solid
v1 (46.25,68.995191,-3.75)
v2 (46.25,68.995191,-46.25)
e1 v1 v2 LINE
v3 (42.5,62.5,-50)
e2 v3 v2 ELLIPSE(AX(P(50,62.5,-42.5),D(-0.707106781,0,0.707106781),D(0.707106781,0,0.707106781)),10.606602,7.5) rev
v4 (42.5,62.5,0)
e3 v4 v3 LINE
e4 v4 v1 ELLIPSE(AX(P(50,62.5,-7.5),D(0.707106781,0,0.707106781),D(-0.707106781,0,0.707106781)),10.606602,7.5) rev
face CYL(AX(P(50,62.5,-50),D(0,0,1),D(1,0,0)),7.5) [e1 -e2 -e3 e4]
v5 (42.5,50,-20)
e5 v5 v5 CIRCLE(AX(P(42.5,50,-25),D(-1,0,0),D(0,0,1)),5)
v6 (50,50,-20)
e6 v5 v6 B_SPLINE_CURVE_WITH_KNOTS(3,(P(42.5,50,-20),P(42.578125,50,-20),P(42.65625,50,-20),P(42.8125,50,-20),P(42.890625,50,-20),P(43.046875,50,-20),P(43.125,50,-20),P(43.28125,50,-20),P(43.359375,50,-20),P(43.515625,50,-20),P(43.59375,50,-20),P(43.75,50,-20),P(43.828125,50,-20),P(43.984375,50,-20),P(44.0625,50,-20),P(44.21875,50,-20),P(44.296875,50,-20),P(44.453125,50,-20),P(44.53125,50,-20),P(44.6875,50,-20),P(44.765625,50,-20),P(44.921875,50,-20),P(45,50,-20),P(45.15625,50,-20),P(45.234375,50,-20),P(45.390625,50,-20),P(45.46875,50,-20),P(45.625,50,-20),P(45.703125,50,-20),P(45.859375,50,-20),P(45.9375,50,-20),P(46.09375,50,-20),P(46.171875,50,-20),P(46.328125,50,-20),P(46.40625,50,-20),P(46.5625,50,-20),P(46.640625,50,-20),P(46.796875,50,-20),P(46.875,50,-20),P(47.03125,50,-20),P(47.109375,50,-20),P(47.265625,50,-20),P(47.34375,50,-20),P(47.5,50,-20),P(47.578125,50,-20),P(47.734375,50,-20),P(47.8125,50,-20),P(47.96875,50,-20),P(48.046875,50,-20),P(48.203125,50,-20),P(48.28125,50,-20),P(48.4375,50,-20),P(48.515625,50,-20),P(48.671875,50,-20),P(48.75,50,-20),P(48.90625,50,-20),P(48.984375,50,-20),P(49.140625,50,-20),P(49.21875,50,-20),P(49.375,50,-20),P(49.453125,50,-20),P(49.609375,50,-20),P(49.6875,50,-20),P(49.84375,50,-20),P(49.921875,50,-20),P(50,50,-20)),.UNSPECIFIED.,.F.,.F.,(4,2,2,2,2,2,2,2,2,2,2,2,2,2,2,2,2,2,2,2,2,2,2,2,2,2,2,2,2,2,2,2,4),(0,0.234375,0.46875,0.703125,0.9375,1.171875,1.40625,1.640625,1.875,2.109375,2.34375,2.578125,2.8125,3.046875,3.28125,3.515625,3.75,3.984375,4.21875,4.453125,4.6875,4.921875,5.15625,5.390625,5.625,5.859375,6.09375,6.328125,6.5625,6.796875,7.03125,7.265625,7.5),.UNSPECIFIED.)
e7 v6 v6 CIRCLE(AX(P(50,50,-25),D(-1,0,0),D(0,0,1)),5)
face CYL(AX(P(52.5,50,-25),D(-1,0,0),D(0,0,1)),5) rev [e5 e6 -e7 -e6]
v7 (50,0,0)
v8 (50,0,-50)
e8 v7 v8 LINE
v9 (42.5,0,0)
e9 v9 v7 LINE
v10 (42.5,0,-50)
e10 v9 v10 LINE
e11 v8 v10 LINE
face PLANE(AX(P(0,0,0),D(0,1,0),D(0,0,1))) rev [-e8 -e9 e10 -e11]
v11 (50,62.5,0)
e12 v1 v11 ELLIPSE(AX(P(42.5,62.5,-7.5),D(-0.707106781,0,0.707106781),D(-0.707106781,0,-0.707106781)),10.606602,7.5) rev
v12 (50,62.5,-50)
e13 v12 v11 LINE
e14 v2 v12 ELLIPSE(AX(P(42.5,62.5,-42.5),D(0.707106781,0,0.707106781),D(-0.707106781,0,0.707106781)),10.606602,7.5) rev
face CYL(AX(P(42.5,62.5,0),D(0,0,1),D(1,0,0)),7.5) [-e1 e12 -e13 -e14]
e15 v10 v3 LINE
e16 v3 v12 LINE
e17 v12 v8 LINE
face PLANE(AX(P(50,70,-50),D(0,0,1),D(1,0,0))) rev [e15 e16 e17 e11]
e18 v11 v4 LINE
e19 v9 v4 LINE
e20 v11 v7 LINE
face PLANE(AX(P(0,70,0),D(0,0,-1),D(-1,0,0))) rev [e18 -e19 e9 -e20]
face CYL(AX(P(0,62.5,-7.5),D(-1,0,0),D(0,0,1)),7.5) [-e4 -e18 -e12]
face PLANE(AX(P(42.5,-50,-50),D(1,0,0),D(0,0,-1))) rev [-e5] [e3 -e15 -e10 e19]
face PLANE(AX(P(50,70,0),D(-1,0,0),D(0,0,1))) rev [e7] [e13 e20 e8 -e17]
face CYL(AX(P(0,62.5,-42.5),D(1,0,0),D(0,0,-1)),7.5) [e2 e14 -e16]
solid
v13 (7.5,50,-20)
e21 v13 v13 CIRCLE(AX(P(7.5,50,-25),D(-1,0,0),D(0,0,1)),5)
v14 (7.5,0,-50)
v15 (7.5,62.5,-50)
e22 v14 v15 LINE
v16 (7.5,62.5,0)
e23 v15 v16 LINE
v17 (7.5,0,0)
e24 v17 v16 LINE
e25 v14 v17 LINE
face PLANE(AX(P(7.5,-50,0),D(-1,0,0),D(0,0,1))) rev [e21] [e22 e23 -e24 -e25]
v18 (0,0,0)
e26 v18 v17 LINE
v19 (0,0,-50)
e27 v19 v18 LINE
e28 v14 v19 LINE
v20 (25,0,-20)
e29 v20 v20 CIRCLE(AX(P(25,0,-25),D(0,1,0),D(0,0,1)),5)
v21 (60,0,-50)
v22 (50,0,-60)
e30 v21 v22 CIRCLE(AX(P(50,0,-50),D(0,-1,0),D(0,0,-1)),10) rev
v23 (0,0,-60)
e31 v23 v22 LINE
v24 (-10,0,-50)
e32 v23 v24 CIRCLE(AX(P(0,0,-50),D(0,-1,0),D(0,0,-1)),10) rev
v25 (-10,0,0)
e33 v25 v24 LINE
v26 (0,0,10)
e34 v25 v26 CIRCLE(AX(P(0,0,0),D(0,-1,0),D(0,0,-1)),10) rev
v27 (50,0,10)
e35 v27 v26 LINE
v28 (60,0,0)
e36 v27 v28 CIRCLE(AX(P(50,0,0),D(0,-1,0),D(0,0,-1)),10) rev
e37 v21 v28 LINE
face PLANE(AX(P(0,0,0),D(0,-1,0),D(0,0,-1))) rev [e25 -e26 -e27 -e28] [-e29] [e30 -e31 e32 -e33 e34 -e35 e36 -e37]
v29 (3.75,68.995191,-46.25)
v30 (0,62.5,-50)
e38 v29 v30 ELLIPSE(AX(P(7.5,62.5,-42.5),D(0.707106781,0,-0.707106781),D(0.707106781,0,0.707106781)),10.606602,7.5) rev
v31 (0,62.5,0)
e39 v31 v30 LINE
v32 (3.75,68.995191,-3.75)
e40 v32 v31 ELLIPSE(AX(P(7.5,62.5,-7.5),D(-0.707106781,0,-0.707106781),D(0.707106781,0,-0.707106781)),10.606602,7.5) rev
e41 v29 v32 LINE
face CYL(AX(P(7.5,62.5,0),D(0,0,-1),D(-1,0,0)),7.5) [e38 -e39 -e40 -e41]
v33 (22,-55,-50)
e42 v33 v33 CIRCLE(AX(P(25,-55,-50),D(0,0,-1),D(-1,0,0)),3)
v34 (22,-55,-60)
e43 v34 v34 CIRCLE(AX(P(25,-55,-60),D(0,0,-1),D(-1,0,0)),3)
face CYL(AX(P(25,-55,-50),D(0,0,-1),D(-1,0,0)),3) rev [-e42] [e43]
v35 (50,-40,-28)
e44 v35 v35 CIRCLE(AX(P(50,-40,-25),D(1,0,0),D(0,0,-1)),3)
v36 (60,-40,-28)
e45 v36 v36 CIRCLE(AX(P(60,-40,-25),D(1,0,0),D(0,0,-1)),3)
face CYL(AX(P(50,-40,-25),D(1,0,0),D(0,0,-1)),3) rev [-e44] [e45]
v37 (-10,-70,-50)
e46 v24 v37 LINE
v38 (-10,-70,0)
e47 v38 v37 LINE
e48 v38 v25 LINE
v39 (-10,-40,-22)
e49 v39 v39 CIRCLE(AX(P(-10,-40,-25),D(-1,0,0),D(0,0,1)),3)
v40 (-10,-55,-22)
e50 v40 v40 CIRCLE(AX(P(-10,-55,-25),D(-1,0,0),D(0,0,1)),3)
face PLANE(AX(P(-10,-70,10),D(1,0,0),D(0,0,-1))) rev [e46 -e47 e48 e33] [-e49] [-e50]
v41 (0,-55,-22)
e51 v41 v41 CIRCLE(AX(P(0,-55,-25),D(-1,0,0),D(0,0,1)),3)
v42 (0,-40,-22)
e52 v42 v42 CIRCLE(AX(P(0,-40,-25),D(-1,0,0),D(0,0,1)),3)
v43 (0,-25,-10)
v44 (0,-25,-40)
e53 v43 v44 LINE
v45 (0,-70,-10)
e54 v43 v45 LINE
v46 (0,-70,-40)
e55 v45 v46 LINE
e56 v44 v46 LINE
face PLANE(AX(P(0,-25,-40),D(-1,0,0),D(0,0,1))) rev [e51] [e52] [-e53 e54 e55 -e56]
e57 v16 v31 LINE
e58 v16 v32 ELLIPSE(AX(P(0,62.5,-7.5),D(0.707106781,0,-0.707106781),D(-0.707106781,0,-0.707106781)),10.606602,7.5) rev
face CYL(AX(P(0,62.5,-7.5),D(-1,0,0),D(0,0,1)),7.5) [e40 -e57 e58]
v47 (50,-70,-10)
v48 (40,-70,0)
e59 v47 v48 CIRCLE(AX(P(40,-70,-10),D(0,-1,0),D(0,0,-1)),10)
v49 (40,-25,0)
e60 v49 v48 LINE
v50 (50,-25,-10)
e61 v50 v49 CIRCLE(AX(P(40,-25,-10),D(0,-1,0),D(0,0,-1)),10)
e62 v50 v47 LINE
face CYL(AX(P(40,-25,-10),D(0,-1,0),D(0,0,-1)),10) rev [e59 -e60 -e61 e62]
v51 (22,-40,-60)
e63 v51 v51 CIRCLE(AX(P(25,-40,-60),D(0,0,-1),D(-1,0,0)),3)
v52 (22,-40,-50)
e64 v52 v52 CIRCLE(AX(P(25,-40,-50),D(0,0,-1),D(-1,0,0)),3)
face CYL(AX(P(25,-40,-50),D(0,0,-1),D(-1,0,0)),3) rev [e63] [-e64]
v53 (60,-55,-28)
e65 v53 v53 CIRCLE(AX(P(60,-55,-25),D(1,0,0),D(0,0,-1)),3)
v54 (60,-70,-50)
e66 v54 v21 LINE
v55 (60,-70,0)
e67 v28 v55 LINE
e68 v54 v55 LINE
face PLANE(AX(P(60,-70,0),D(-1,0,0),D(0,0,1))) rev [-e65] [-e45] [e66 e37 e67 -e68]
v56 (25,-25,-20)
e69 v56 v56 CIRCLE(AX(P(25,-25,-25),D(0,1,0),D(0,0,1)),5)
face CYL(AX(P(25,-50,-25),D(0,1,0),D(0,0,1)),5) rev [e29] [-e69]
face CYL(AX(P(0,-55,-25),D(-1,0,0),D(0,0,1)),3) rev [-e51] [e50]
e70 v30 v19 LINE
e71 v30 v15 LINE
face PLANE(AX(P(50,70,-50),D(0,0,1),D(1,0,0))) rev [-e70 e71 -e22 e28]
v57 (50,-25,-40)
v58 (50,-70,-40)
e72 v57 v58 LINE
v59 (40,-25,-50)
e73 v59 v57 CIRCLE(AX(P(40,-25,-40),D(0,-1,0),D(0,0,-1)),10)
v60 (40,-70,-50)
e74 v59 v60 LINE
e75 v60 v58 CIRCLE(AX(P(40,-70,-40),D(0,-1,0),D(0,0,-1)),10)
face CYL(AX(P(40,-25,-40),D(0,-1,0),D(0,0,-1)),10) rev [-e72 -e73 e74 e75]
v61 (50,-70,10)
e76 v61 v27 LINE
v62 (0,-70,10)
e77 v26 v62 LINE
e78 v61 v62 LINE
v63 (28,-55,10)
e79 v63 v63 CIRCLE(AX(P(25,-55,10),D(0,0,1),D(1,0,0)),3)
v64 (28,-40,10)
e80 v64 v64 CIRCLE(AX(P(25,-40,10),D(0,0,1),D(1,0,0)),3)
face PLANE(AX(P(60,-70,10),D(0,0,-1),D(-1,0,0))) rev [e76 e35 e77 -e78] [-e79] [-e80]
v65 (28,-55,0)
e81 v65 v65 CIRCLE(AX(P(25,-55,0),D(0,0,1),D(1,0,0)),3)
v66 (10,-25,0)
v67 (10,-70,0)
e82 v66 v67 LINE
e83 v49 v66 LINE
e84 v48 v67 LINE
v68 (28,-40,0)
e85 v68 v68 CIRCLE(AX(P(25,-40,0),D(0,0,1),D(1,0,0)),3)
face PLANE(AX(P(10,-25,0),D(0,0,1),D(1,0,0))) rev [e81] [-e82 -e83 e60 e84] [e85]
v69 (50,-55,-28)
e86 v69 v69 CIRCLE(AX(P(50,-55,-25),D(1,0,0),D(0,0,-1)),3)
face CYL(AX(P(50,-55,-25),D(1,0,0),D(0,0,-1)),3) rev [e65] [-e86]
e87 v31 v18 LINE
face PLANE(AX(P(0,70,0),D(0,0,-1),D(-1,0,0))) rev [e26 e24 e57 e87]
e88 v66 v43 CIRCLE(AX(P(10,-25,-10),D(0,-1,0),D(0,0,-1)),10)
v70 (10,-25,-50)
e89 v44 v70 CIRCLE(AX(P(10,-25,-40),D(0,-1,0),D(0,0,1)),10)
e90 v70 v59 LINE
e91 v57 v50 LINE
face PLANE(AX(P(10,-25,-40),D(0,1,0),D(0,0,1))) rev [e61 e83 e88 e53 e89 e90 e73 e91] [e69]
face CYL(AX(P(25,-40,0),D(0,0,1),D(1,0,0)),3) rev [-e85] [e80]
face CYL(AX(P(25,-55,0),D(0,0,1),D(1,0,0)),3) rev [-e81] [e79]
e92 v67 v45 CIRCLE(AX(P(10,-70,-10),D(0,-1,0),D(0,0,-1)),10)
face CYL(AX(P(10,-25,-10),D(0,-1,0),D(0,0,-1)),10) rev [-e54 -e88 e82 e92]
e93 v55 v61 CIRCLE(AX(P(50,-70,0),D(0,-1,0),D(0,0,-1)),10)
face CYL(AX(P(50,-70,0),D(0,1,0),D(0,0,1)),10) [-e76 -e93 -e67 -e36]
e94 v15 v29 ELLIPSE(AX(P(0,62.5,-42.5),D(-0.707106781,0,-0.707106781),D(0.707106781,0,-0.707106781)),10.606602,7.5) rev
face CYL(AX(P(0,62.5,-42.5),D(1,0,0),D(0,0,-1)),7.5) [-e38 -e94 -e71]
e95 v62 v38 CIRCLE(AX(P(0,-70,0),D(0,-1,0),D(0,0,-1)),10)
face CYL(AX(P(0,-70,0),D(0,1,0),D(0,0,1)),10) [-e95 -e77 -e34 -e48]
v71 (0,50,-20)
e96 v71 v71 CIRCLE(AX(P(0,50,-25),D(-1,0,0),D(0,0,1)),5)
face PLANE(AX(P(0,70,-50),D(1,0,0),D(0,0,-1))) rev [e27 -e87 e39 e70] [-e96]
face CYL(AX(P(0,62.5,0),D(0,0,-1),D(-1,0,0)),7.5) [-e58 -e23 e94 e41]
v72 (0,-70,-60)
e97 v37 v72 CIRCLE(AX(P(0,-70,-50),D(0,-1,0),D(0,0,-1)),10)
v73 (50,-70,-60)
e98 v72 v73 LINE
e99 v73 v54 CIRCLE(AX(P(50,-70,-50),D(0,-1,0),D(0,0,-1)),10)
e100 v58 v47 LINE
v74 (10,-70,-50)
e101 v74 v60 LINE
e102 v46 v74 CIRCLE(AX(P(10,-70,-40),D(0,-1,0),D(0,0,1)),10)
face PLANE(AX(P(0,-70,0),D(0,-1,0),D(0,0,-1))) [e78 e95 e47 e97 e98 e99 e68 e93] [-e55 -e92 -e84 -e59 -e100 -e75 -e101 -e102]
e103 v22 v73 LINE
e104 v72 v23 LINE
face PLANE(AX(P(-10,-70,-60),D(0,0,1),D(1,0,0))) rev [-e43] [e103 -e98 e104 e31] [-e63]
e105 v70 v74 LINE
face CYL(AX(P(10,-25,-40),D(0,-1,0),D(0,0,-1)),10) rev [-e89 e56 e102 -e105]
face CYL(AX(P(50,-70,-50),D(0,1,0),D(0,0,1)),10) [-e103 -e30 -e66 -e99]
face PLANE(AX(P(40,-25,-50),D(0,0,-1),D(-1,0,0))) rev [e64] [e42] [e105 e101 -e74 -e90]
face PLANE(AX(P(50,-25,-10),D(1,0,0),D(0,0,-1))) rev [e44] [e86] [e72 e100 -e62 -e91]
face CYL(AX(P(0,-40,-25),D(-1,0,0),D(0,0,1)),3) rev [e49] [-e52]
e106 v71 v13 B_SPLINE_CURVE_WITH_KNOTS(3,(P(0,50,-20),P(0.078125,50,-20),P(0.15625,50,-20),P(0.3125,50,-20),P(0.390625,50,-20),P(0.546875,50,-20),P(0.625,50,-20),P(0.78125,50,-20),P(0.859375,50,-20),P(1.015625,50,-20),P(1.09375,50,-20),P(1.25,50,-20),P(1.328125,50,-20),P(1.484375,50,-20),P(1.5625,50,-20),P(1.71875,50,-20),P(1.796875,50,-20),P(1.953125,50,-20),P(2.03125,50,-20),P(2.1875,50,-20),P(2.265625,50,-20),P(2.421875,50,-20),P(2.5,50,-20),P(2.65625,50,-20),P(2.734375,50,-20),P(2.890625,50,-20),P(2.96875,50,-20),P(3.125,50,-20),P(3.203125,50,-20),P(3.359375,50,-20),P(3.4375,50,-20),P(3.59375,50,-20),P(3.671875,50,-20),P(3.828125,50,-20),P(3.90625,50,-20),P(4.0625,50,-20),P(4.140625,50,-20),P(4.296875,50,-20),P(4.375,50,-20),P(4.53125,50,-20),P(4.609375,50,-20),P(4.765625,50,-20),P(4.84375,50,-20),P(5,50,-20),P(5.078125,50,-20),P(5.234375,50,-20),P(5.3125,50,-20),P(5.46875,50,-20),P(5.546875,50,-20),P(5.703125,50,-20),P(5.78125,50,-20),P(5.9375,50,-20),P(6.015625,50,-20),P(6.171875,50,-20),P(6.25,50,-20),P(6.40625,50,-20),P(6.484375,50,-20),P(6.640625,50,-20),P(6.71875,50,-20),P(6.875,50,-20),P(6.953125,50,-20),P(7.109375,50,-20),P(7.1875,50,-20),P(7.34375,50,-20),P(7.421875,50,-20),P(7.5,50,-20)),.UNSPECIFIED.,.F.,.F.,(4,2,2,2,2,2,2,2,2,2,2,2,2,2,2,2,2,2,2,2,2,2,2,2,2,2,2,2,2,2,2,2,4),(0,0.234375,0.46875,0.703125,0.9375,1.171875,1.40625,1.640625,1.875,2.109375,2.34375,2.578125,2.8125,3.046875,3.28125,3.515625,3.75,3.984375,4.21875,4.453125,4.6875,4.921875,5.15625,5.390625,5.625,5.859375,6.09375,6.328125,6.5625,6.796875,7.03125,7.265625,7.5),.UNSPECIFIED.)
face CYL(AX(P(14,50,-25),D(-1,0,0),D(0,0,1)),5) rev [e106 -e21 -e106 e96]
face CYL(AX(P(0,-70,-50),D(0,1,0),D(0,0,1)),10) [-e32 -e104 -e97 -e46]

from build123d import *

# Parameters (mm, degrees)
SKETCH1_W           = 50
SKETCH1_H           = 50
BOSS_EXTRUDE1_DEPTH = 70
SKETCH3_W           = 35
SKETCH3_H           = 50
CUT_EXTRUDE1_DEPTH  = 120
SKETCH4_R           = 5
CUT_EXTRUDE2_DEPTH  = 14
FILLET2_R           = 7.5
BOSS_EXTRUDE2_DEPTH = 70
FILLET4_R           = 10
CUT_EXTRUDE10_DEPTH = 45
SKETCH10_R          = 3
CUT_EXTRUDE6_DEPTH  = 10
SKETCH12_R          = 3
CUT_EXTRUDE7_DEPTH  = 10
SKETCH13_R          = 3
CUT_EXTRUDE8_DEPTH  = 10
SKETCH14_R          = 3
CUT_EXTRUDE9_DEPTH  = 10
FILLET5_R           = 7.5
SKETCH16_R          = 5
CUT_EXTRUDE12_DEPTH = 10
SKETCH17_R          = 5
CUT_EXTRUDE13_DEPTH = 50


with BuildPart() as part:
    # Sketch1 → Boss-Extrude1 (new body)
    with BuildSketch(Plane(origin=(0, 0, 0), x_dir=(1, 0, 0), z_dir=(0, 1, 0))):
        with Locations((25, 25)):
            Rectangle(SKETCH1_W, SKETCH1_H)
    extrude(amount=BOSS_EXTRUDE1_DEPTH)

    # Sketch3 → Cut-Extrude1 (cut)
    with BuildSketch(Plane(origin=(0, 70, 0), x_dir=(1, 0, 0), z_dir=(0, 1, 0))):
        with Locations((25, 25)):
            Rectangle(SKETCH3_W, SKETCH3_H)
    extrude(amount=-CUT_EXTRUDE1_DEPTH, mode=Mode.SUBTRACT)


with BuildPart() as cut_extrude1_piece_1:
    # of the separate pieces the step leaves, piece 1, a body of its own (cut_extrude1_pieces)
    add(part.part.solids().sort_by_distance((42.5, 0, 0))[0])

    # Fillet2
    # the kernel refuses this fillet: 7.5 mm, written as the material it takes off along each edge
    with BuildSketch(Plane(origin=(50, 70, 18.75), x_dir=(0, -1, 0), z_dir=(0, 0, -1))) as fillet2_piece_1:
        with BuildLine():
            CenterArc((FILLET2_R, FILLET2_R), FILLET2_R, 180, 90)
            Line((0, FILLET2_R), (0, 0))
            Line((0, 0), (FILLET2_R, 0))
        make_face()
    extrude(amount=87.5, mode=Mode.SUBTRACT)
    with BuildSketch(Plane(origin=(23.75, 70, 0), x_dir=(0, -1, 0), z_dir=(1, 0, 0))) as fillet2_piece_2:
        with BuildLine():
            CenterArc((FILLET2_R, FILLET2_R), FILLET2_R, 180, 90)
            Line((0, FILLET2_R), (0, 0))
            Line((0, 0), (FILLET2_R, 0))
        make_face()
    extrude(amount=45, mode=Mode.SUBTRACT)
    with BuildSketch(Plane(origin=(68.75, 70, -50), x_dir=(0, 0, 1), z_dir=(-1, 0, 0))) as fillet2_piece_3:
        with BuildLine():
            CenterArc((FILLET2_R, -FILLET2_R), FILLET2_R, 90, 90)
            Line((0, -FILLET2_R), (0, 0))
            Line((0, 0), (FILLET2_R, 0))
        make_face()
    extrude(amount=45, mode=Mode.SUBTRACT)
    with BuildSketch(Plane(origin=(42.5, 70, -68.75), x_dir=(1, 0, 0), z_dir=(0, 0, 1))) as fillet2_piece_4:
        with BuildLine():
            CenterArc((FILLET2_R, -FILLET2_R), FILLET2_R, 90, 90)
            Line((0, -FILLET2_R), (0, 0))
            Line((0, 0), (FILLET2_R, 0))
        make_face()
    extrude(amount=87.5, mode=Mode.SUBTRACT)

    # Sketch16 → Cut-Extrude12 (cut)
    with BuildSketch(Plane.ZY.offset(-42.5)):
        with Locations((-25, 50)):
            Circle(SKETCH16_R)
    extrude(amount=-CUT_EXTRUDE12_DEPTH, mode=Mode.SUBTRACT)


with BuildPart() as cut_extrude1_piece_2:
    # of the separate pieces the step leaves, piece 2, a body of its own (cut_extrude1_pieces)
    add(part.part.solids().sort_by_distance((0, 0, 0))[0])

    # Sketch4 → Cut-Extrude2 (cut)
    with BuildSketch(Plane.ZY):
        with Locations((-25, 50)):
            Circle(SKETCH4_R)
    extrude(amount=-CUT_EXTRUDE2_DEPTH, mode=Mode.SUBTRACT)

    # Sketch6 → Boss-Extrude2 (add)
    with BuildSketch(Plane(origin=(0, 0, 0), x_dir=(-1, 0, 0), z_dir=(0, -1, 0))):
        Polygon((-60, 0), (-60, -10), (10, -10), (10, 60), (-60, 60), align=None)
    extrude(amount=BOSS_EXTRUDE2_DEPTH)

    # Fillet4
    fillet4_edges = [cut_extrude1_piece_2.edges().sort_by_distance(p)[0] for p in [
        (60, -35, -60),
        (60, -35, 10),
        (-10, -35, 10),
        (-10, -35, -60),
    ]]
    fillet(fillet4_edges, radius=FILLET4_R)

    # Sketch15 → Cut-Extrude10 (cut)
    with BuildSketch(Plane.XZ.offset(70)):
        with BuildLine():
            Line((10, 0), (40, 0))
            ThreePointArc((40, 0), (47.071067812, -2.928932188), (50, -10))
            Line((50, -10), (50, -40))
            ThreePointArc((50, -40), (47.071067812, -47.071067812), (40, -50))
            Line((40, -50), (10, -50))
            ThreePointArc((10, -50), (2.928932188, -47.071067812), (0, -40))
            Line((0, -40), (0, -10))
            ThreePointArc((0, -10), (2.928932188, -2.928932188), (10, 0))
        make_face()
    extrude(amount=-CUT_EXTRUDE10_DEPTH, mode=Mode.SUBTRACT)

    # Sketch10 → Cut-Extrude6 (cut)
    with BuildSketch(Plane.ZY.offset(10)):
        with Locations((-25, -40)):
            Circle(SKETCH10_R)
        with Locations((-25, -55)):
            Circle(SKETCH10_R)
    extrude(amount=-CUT_EXTRUDE6_DEPTH, mode=Mode.SUBTRACT)

    # Sketch12 → Cut-Extrude7 (cut)
    with BuildSketch(Plane(origin=(0, 0, -60), x_dir=(-1, 0, 0), z_dir=(0, 0, -1))):
        with Locations((-25, -40)):
            Circle(SKETCH12_R)
        with Locations((-25, -55)):
            Circle(SKETCH12_R)
    extrude(amount=-CUT_EXTRUDE7_DEPTH, mode=Mode.SUBTRACT)

    # Sketch13 → Cut-Extrude8 (cut)
    with BuildSketch(Plane(origin=(60, 0, 0), x_dir=(0, 0, -1), z_dir=(1, 0, 0))):
        with Locations(Location((25, -40, 0), (0, 0, 180))):
            Circle(SKETCH13_R)
        with Locations(Location((25, -55, 0), (0, 0, 180))):
            Circle(SKETCH13_R)
    extrude(amount=-CUT_EXTRUDE8_DEPTH, mode=Mode.SUBTRACT)

    # Sketch14 → Cut-Extrude9 (cut)
    with BuildSketch(Plane.XY.offset(10)):
        with Locations(Location((25, -40, 0), (0, 0, 180))):
            Circle(SKETCH14_R)
        with Locations(Location((25, -55, 0), (0, 0, 180))):
            Circle(SKETCH14_R)
    extrude(amount=-CUT_EXTRUDE9_DEPTH, mode=Mode.SUBTRACT)

    # Fillet5
    # the kernel refuses this fillet: 7.5 mm, written as the material it takes off along each edge
    with BuildSketch(Plane(origin=(26.25, 70, -50), x_dir=(0, -1, 0), z_dir=(-1, 0, 0)), Plane(origin=(-18.75, 70, 0), x_dir=(0, -1, 0), z_dir=(1, 0, 0))) as fillet5_piece_1:
        with BuildLine():
            CenterArc((FILLET5_R, FILLET5_R), FILLET5_R, 180, 90)
            Line((0, FILLET5_R), (0, 0))
            Line((0, 0), (FILLET5_R, 0))
        make_face()
    extrude(amount=45, mode=Mode.SUBTRACT)
    with BuildSketch(Plane(origin=(0, 70, -68.75), x_dir=(0, -1, 0), z_dir=(0, 0, 1)), Plane(origin=(7.5, 70, 18.75), x_dir=(0, -1, 0), z_dir=(0, 0, -1))) as fillet5_piece_2:
        with BuildLine():
            CenterArc((FILLET5_R, FILLET5_R), FILLET5_R, 180, 90)
            Line((0, FILLET5_R), (0, 0))
            Line((0, 0), (FILLET5_R, 0))
        make_face()
    extrude(amount=87.5, mode=Mode.SUBTRACT)

    # Sketch17 → Cut-Extrude13 (cut)
    with BuildSketch(Plane(origin=(0, 0, 0), x_dir=(1, 0, 0), z_dir=(0, 1, 0))):
        with Locations(Location((25, 25, 0), (0, 0, 270))):
            Circle(SKETCH17_R)
    extrude(amount=-CUT_EXTRUDE13_DEPTH, mode=Mode.SUBTRACT)


solid = Compound([cut_extrude1_piece_1.part, cut_extrude1_piece_2.part])
